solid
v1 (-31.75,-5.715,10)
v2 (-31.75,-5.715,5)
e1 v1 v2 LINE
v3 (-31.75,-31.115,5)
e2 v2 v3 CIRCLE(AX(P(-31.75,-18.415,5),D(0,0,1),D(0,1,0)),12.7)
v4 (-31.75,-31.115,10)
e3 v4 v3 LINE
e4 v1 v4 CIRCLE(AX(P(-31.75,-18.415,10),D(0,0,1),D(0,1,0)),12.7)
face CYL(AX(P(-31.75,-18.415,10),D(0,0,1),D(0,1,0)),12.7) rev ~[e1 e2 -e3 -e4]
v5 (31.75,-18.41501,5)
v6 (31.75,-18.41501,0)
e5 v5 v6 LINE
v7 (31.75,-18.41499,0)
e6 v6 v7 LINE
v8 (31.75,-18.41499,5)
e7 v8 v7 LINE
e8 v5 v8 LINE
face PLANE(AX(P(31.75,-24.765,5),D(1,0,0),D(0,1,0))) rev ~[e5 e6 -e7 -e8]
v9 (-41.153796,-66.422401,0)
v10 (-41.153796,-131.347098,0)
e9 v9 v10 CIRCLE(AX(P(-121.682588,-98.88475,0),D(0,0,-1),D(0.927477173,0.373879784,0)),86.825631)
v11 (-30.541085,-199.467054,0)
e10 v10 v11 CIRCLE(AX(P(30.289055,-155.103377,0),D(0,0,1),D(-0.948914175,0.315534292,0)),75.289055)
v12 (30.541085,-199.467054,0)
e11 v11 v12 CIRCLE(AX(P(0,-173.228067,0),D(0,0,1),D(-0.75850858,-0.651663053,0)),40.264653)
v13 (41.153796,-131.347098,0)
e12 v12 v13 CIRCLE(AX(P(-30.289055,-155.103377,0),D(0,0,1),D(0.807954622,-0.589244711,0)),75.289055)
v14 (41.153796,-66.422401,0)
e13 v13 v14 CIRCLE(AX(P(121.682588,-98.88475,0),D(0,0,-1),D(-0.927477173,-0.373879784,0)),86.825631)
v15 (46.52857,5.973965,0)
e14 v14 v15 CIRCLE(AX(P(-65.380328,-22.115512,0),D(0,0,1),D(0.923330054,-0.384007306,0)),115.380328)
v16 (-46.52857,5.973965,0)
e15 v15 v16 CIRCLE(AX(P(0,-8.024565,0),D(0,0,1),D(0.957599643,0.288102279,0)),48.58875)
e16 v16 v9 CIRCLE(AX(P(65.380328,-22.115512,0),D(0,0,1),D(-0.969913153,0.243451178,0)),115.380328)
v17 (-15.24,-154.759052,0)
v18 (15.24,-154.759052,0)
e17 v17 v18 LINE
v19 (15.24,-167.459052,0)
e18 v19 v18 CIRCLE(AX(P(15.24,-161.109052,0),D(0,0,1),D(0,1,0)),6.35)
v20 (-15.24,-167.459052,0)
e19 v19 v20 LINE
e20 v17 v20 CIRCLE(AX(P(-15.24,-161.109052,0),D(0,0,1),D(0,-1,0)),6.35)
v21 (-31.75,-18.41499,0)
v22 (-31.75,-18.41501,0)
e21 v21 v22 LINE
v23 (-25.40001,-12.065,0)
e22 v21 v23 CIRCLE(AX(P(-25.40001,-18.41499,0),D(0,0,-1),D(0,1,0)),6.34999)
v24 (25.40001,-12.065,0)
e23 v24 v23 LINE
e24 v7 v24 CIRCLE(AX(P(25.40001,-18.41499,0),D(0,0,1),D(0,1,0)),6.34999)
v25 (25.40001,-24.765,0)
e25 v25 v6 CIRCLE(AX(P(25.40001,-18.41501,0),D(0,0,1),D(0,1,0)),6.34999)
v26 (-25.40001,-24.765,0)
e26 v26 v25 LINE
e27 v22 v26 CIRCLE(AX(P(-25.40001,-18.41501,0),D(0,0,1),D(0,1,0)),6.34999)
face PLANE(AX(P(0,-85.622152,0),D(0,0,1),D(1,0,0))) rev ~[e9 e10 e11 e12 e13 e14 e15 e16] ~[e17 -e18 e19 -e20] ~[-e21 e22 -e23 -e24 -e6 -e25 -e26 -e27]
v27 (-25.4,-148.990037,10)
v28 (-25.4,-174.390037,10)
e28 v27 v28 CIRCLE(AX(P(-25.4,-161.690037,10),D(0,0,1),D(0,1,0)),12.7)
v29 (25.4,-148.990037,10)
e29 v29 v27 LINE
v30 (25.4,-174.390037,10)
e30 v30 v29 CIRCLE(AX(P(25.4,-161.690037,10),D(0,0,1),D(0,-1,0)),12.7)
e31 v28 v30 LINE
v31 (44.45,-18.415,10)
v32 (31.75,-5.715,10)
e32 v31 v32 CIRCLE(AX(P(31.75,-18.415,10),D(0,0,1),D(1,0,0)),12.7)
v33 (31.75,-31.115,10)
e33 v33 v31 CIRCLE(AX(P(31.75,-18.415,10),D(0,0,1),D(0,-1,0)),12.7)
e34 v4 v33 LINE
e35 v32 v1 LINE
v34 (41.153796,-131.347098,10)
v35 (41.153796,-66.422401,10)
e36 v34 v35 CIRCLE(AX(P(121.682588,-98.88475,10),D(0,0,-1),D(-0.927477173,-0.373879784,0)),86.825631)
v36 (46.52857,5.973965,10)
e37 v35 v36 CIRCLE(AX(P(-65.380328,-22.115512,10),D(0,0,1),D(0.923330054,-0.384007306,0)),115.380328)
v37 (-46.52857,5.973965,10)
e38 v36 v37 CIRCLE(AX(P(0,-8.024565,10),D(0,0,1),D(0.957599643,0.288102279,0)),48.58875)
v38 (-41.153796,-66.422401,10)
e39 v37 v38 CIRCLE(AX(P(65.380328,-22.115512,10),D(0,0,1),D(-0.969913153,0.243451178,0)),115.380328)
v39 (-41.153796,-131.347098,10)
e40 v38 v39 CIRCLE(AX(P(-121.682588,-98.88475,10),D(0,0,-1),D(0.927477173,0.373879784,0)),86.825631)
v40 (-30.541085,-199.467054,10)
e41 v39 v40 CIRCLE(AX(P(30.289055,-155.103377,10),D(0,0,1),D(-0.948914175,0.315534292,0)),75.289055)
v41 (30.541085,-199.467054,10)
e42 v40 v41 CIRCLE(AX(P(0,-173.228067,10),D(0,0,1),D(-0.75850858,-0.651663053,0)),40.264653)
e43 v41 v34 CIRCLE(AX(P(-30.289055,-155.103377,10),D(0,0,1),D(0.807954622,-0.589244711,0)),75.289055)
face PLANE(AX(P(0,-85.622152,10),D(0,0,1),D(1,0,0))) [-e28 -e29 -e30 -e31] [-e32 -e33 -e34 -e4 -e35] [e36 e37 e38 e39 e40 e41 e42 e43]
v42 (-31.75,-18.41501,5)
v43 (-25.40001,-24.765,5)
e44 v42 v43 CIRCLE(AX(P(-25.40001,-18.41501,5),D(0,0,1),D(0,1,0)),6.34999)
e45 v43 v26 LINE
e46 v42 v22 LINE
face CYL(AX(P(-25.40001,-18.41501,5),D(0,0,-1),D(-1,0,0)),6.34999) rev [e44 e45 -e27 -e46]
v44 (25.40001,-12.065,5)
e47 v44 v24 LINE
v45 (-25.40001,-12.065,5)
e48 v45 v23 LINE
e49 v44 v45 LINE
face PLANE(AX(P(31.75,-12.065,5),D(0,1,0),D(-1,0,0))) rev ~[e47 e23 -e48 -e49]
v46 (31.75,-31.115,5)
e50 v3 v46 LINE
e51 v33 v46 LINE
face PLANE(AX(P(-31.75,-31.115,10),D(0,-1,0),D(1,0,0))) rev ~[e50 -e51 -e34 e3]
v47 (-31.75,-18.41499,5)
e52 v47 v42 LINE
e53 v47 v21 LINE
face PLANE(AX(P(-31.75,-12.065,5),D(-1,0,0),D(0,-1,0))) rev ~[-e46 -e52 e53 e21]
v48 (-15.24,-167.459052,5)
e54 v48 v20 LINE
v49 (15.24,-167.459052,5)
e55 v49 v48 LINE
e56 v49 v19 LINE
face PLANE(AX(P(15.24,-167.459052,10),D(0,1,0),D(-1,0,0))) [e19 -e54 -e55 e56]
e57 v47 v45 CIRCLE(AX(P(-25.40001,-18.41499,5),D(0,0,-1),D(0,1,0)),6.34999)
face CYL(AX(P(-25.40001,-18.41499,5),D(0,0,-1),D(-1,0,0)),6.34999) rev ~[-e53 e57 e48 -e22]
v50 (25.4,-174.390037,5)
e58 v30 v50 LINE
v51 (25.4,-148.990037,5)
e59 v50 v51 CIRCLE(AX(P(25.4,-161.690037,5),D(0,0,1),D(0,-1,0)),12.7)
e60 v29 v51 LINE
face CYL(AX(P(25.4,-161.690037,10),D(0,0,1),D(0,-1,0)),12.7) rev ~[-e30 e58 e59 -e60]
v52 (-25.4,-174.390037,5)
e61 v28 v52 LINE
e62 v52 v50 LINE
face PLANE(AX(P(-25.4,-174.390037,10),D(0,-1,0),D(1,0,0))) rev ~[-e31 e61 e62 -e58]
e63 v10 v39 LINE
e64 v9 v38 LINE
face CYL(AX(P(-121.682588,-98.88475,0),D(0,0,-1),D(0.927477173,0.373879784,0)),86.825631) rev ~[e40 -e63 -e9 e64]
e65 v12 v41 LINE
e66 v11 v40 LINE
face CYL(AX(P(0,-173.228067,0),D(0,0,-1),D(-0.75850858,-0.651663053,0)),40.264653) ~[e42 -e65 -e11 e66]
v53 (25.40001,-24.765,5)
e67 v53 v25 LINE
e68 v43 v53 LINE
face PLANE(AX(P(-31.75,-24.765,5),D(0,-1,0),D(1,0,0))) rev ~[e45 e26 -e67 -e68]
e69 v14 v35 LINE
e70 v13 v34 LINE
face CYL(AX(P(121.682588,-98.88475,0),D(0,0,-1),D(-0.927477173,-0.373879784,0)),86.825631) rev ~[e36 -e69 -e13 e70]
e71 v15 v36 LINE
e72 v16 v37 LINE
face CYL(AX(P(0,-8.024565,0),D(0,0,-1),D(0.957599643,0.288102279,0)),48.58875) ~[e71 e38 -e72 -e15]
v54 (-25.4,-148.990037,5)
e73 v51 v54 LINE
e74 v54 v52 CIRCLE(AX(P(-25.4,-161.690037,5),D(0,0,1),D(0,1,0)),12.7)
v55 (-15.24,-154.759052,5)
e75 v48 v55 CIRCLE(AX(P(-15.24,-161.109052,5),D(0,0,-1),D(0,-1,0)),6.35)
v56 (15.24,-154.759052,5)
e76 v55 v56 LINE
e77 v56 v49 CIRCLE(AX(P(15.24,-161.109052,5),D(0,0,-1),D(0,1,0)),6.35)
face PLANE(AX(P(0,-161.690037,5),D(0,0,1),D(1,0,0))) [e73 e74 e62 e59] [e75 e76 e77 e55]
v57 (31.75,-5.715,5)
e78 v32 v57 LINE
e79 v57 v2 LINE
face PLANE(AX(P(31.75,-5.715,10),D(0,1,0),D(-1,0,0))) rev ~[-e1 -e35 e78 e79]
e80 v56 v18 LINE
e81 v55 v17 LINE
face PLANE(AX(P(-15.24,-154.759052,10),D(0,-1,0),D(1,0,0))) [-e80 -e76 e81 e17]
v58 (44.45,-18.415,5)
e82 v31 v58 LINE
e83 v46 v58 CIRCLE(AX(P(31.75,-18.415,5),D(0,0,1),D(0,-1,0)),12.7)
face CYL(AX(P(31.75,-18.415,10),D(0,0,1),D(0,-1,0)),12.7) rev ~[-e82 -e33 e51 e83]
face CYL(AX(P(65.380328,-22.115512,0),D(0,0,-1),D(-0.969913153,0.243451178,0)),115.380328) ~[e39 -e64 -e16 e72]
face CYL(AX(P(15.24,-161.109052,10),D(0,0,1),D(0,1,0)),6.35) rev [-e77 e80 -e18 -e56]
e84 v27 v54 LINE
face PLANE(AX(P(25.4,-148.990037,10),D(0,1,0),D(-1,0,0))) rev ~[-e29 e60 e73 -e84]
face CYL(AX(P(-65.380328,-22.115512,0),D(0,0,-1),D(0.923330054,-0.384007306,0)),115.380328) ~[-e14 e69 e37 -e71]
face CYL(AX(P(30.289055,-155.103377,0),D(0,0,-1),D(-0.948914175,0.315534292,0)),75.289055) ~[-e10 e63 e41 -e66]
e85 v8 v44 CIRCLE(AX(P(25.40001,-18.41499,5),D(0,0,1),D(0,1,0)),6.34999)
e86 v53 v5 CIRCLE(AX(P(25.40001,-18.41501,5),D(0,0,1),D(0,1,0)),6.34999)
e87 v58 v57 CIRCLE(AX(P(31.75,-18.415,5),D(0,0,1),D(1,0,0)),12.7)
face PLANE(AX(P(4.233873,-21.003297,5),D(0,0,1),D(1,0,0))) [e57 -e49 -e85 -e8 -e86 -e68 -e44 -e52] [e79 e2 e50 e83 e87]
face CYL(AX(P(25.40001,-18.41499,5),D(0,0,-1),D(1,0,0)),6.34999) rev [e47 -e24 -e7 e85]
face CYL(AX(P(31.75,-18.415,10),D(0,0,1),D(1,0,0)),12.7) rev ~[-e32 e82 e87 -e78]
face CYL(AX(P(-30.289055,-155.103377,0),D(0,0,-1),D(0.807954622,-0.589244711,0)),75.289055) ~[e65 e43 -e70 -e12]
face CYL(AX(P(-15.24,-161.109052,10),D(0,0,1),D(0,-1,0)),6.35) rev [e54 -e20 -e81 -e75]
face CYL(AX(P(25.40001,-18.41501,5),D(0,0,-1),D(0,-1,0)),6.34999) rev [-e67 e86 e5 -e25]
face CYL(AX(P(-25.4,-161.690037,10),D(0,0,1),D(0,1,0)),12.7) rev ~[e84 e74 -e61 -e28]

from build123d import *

# Parameters (mm, degrees)
F1_DEPTH = 10
F3_DEPTH = 5
F5_DEPTH = 25.4
F6_R     = 6.34999
F8_DEPTH = 5
F9_DEPTH = 25.4


# Not quite as in the source:
# - a fillet or chamfer is up to 0.001 mm smaller than in the source, because OpenCascade refuses the exact size


with BuildPart() as f1:
    # F0 (on Top) → F1 (new body)
    with BuildSketch(Plane.XY):
        with BuildLine():
            ThreePointArc((46.5285696909, 5.9739645023), (0, 40.5641849146), (-46.5285696909, 5.9739645023))
            ThreePointArc((-46.5285696909, 5.9739645023), (-49.6833366753, -30.6579453037), (-41.1537964933, -66.4224013325))
            ThreePointArc((-41.1537964933, -66.4224013325), (-34.8569562758, -98.8847496511), (-41.1537964933, -131.3470979697))
            ThreePointArc((-41.1537964933, -131.3470979697), (-44.1025989066, -166.693183735), (-30.5410850268, -199.467053752))
            ThreePointArc((-30.5410850268, -199.467053752), (0, -213.4927201844), (30.5410850268, -199.467053752))
            ThreePointArc((30.5410850268, -199.467053752), (44.1025989066, -166.693183735), (41.1537964933, -131.3470979697))
            ThreePointArc((41.1537964933, -131.3470979697), (34.8569562758, -98.8847496511), (41.1537964933, -66.4224013325))
            ThreePointArc((41.1537964933, -66.4224013325), (49.6833366753, -30.6579453037), (46.5285696909, 5.9739645023))
        make_face()
    extrude(amount=F1_DEPTH)

    # F2 (on face) → F3 (cut)
    with BuildSketch(Plane.XY.offset(10)):
        with BuildLine():
            Line((31.75, -5.715), (0, -5.715))
            Line((0, -5.715), (0, -18.415))
            Line((0, -18.415), (-19.05, -18.415))
            ThreePointArc((-19.05, -18.415), (-22.7697438789, -27.3952561211), (-31.75, -31.115))
            Line((-31.75, -31.115), (31.75, -31.115))
            ThreePointArc((31.75, -31.115), (19.05, -18.415), (31.75, -5.715))
        make_face()
        with BuildLine():
            Line((0, -18.415), (0, -5.715))
            Line((0, -5.715), (-31.75, -5.715))
            ThreePointArc((-31.75, -5.715), (-22.7697438789, -9.4347438789), (-19.05, -18.415))
            Line((-19.05, -18.415), (0, -18.415))
        make_face()
        with BuildLine():
            ThreePointArc((-19.05, -18.415), (-22.7697438789, -9.4347438789), (-31.75, -5.715))
            ThreePointArc((-31.75, -5.715), (-44.45, -18.415), (-31.75, -31.115))
            ThreePointArc((-31.75, -31.115), (-22.7697438789, -27.3952561211), (-19.05, -18.415))
        make_face()
        with BuildLine():
            ThreePointArc((44.45, -18.415), (40.7302561211, -9.4347438789), (31.75, -5.715))
            ThreePointArc((31.75, -5.715), (19.05, -18.415), (31.75, -31.115))
            ThreePointArc((31.75, -31.115), (40.7302561211, -27.3952561211), (44.45, -18.415))
        make_face()
    extrude(amount=-F3_DEPTH, mode=Mode.SUBTRACT)

    # F4 (on face) → F5 (cut)
    with BuildSketch(Plane.XY.offset(5)):
        Polygon((-31.75, -12.065), (-31.75, -18.415), (-31.75, -24.765), (31.75, -24.765), (31.75, -12.065), align=None)
    extrude(amount=-F5_DEPTH, mode=Mode.SUBTRACT)

    # F6 (radius 6.35 in the source; OpenCascade refuses exactly that, so slightly less here)
    f6_edges = [f1.edges().sort_by_distance(p)[0] for p in [
        (-31.75, -12.065, 2.5),
        (-31.75, -24.765, 2.5),
        (31.75, -12.065, 2.5),
        (31.75, -24.765, 2.5),
    ]]
    fillet(f6_edges, radius=F6_R)

    # F7 (on face) → F8 (cut)
    with BuildSketch(Plane.XY.offset(10)):
        with BuildLine():
            Line((25.4, -148.9900371552), (-25.4, -148.9900371552))
            ThreePointArc((-25.4, -148.9900371552), (-38.1, -161.6900371552), (-25.4, -174.3900371552))
            Line((-25.4, -174.3900371552), (25.4, -174.3900371552))
            ThreePointArc((25.4, -174.3900371552), (38.1, -161.6900371552), (25.4, -148.9900371552))
        make_face()
        with BuildLine():
            ThreePointArc((-15.24, -167.4590520005), (-21.59, -161.1090520005), (-15.24, -154.7590520005))
            Line((-15.24, -154.7590520005), (15.24, -154.7590520005))
            ThreePointArc((15.24, -154.7590520005), (21.59, -161.1090520005), (15.24, -167.4590520005))
            Line((15.24, -167.4590520005), (-15.24, -167.4590520005))
        make_face(mode=Mode.SUBTRACT)
    extrude(amount=-F8_DEPTH, mode=Mode.SUBTRACT)

    # F9 (cut): a face of the model
    f9_faces = [f1.faces().sort_by_distance(p)[0] for p in [
        (0, -161.1090520005, 10),
    ]]
    extrude(f9_faces, amount=-F9_DEPTH, mode=Mode.SUBTRACT)


solid = f1.part
